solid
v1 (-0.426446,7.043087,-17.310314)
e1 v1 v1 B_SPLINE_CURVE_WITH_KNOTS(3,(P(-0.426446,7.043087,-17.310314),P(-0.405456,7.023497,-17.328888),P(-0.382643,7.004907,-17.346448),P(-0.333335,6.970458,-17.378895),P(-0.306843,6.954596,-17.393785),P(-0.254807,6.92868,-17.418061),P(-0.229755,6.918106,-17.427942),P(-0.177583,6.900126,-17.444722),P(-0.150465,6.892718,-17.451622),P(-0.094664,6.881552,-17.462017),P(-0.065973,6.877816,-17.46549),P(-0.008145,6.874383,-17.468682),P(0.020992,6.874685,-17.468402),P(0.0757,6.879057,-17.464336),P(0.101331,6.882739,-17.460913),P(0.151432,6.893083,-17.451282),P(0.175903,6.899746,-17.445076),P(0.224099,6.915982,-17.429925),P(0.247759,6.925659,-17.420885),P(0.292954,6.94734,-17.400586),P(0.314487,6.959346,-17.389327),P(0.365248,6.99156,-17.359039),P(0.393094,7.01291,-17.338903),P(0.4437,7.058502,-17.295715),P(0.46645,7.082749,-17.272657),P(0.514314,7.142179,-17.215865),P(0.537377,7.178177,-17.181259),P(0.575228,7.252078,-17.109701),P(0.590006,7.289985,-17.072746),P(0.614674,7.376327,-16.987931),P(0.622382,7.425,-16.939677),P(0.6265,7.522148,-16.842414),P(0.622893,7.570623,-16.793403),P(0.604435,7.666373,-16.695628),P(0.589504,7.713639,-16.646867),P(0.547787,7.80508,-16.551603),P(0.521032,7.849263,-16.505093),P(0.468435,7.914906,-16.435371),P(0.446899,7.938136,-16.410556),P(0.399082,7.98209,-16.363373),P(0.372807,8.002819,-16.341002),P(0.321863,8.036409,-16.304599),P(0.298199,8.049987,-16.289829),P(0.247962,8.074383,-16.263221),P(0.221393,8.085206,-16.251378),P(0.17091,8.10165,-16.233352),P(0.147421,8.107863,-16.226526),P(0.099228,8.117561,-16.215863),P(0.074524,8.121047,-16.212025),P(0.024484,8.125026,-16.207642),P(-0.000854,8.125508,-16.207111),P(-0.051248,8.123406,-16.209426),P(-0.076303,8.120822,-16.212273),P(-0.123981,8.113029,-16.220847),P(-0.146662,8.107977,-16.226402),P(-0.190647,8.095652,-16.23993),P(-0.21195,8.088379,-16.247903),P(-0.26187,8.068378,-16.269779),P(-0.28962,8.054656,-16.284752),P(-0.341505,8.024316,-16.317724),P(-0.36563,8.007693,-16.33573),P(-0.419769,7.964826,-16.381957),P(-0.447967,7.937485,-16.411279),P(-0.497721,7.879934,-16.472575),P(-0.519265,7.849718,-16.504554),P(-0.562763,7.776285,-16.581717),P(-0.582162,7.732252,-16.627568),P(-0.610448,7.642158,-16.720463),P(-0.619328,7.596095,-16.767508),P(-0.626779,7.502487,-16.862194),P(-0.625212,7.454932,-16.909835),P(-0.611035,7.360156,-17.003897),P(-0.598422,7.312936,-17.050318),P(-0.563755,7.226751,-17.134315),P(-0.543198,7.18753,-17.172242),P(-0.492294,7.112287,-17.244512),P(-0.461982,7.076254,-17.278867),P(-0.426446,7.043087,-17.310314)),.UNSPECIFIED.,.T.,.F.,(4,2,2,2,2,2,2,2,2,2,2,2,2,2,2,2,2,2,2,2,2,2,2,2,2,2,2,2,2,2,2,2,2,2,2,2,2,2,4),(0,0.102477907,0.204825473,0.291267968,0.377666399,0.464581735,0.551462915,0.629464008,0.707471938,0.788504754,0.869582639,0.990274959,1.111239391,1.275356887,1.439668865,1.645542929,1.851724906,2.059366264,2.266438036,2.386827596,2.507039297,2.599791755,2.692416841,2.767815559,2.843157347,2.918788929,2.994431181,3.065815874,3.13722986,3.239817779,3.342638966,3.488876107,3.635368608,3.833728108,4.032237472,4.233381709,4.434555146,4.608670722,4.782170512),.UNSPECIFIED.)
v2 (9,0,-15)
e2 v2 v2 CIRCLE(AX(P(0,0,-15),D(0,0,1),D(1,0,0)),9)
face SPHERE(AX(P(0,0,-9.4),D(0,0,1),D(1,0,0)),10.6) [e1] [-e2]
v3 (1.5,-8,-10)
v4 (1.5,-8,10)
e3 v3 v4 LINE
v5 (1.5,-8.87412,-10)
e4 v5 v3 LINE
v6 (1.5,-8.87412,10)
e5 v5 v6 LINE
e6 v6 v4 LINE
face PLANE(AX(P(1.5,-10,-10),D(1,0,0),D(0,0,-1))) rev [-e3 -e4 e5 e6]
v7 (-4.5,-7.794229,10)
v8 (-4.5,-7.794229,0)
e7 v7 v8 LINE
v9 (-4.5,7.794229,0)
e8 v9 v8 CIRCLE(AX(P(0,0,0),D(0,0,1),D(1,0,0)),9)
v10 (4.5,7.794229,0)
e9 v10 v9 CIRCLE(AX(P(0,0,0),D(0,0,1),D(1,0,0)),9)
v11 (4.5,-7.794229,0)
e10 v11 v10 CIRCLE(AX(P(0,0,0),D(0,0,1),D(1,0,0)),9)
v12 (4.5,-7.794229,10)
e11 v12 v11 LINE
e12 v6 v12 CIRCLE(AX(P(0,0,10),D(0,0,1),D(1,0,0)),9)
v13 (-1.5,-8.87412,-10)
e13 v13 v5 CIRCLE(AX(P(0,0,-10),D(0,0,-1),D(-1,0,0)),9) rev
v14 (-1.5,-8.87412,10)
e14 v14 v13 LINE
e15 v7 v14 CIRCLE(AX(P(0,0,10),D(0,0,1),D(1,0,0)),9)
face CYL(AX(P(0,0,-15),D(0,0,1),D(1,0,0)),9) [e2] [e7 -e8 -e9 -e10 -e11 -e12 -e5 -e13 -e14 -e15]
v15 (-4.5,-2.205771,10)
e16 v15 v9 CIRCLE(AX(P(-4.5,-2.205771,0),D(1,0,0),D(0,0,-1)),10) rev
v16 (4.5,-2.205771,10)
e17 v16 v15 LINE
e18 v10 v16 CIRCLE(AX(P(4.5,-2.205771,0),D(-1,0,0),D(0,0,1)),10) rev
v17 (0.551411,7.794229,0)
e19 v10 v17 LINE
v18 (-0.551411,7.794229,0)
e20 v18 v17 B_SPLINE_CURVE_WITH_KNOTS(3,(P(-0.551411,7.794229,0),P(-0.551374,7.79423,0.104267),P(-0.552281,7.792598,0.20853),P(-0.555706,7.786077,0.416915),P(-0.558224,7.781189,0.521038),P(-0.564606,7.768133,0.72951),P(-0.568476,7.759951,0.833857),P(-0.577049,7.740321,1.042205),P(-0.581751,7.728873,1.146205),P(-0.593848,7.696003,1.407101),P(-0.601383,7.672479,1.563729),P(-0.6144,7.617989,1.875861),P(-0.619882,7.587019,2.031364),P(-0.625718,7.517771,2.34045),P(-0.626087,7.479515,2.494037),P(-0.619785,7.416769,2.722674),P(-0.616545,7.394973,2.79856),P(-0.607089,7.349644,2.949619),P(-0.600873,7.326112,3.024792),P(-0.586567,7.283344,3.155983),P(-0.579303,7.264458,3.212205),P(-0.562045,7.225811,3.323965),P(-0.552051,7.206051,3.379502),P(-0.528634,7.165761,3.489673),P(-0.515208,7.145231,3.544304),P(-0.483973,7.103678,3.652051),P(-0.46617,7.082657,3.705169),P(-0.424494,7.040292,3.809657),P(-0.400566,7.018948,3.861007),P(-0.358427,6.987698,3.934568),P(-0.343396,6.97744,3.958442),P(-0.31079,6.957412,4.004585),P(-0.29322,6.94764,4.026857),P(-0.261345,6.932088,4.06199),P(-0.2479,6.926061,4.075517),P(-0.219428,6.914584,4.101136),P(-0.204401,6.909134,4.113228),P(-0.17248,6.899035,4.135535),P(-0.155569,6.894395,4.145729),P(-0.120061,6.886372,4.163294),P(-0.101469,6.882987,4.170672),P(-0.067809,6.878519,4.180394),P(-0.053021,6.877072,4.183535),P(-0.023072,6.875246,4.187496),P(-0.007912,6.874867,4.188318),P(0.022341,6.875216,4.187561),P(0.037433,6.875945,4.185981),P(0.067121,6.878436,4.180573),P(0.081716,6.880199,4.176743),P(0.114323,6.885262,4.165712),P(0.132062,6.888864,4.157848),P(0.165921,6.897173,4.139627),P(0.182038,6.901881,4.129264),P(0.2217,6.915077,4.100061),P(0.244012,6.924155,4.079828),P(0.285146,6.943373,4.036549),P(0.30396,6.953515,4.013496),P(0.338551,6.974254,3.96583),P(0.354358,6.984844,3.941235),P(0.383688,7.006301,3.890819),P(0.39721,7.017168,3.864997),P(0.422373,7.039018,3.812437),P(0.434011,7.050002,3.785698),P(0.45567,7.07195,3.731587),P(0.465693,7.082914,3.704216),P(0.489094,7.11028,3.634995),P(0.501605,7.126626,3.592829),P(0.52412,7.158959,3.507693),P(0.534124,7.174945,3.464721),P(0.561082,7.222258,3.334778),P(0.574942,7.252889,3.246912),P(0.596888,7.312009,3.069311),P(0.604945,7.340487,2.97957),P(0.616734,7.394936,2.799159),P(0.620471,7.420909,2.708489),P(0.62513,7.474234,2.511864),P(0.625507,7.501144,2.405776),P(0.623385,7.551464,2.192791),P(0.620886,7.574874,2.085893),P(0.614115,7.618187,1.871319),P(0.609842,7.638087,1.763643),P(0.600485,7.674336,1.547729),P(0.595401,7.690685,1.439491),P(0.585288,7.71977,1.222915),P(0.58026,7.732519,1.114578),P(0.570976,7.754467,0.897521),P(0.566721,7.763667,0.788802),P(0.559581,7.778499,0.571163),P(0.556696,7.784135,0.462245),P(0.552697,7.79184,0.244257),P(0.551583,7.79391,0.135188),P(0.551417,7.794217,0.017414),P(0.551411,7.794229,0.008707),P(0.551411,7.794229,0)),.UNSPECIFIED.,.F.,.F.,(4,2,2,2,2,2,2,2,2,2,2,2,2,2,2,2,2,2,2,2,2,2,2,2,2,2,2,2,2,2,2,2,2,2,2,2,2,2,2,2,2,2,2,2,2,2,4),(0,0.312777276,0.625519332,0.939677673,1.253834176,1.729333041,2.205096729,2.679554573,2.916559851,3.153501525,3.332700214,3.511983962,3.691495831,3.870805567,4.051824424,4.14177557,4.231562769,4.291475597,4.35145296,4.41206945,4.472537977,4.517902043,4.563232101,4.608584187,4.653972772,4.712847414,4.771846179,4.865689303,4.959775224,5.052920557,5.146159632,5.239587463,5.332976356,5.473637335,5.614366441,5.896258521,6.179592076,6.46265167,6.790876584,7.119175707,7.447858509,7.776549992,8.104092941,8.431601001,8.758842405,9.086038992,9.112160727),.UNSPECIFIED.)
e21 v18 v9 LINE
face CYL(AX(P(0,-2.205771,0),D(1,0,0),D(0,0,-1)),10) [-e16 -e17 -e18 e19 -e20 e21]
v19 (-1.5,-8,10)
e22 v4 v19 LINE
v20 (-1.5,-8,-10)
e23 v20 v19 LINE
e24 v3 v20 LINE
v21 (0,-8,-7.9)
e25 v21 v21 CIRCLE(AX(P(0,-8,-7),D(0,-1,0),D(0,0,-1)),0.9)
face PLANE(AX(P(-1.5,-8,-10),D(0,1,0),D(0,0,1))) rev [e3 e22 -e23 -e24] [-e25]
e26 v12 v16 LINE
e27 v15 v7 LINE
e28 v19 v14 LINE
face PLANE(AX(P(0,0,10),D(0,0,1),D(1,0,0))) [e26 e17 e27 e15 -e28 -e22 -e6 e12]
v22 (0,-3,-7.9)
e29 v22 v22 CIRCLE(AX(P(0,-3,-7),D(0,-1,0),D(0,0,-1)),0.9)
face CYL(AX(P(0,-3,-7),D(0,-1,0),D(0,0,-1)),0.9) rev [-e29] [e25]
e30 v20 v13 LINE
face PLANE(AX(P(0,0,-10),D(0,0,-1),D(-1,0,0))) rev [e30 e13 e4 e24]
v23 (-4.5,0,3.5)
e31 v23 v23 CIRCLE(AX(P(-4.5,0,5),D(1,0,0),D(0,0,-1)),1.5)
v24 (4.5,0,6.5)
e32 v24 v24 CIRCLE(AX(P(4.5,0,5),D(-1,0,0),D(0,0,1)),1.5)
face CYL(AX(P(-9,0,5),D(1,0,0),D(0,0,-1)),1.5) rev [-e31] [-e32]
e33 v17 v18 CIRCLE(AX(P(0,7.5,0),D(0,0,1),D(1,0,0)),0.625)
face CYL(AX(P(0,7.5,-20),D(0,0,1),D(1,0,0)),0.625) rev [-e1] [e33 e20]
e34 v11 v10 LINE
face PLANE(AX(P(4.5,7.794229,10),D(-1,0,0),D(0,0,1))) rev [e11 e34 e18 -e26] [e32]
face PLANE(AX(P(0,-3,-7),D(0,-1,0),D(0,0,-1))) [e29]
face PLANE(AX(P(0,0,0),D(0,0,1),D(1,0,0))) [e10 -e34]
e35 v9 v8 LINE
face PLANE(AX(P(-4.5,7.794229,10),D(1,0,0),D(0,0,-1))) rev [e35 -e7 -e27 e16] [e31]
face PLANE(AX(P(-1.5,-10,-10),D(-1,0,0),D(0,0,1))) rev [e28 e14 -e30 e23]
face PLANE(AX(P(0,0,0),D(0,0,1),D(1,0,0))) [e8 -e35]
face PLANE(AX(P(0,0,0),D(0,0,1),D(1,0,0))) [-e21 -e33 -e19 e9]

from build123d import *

# Parameters (mm, degrees)
SKETCH1_R               = 9
BOSS_EXTRUDE1_DEPTH     = 15
BOSS_EXTRUDE2_START     = 10
BOSS_EXTRUDE2_DEPTH     = 10
DOME2_FACE_RADIUS       = 9
DOME2_HEIGHT            = 5
CUT_EXTRUDE1_DEPTH      = 24.706539182
CUT_EXTRUDE1_DEPTH_BACK = 24.706539182
SKETCH3_R               = 1.5
FILLET4_R               = 10
CUT_EXTRUDE2_DEPTH      = 24.706539182
CUT_EXTRUDE2_DEPTH_BACK = 24.706539182
SKETCH4_R               = 0.625
SKETCH5_W               = 3
SKETCH5_H               = 2
CUT_EXTRUDE3_DEPTH      = 20
SKETCH6_R               = 0.9
CUT_EXTRUDE4_DEPTH      = 5


with BuildPart() as part:
    # Sketch1 → Boss-Extrude1 (new body)
    with BuildSketch(Plane.XY):
        Circle(SKETCH1_R)
    extrude(amount=-BOSS_EXTRUDE1_DEPTH)

    # Sketch2 → Boss-Extrude2 (add)
    with BuildSketch(Plane.XY.offset(BOSS_EXTRUDE2_START)):
        with BuildLine():
            Line((-4.5, 7.794228634), (-4.5, -7.794228634))
            ThreePointArc((-4.5, -7.794228634), (0, -9), (4.5, -7.794228634))
            Line((4.5, -7.794228634), (4.5, 7.794228634))
            Line((4.5, 7.794228634), (-4.5, 7.794228634))
        make_face()
    extrude(amount=-BOSS_EXTRUDE2_DEPTH)

    # Dome2: a dome of height H over a round flat face of radius A is a cap of a sphere of radius (A * A + H * H) / (2 * H)
    dome2_r = (DOME2_FACE_RADIUS * DOME2_FACE_RADIUS + DOME2_HEIGHT * DOME2_HEIGHT) / (2 * DOME2_HEIGHT)
    dome2_base = Plane((0, 0, -15), z_dir=(0, 0, -1))
    with Locations(dome2_base.offset(DOME2_HEIGHT - dome2_r)):
        dome2_ball = Sphere(dome2_r, mode=Mode.PRIVATE)
    add(split(dome2_ball, bisect_by=dome2_base, keep=Keep.TOP, mode=Mode.PRIVATE))

    # Sketch3 → Cut-Extrude1 (cut, two sides: drawn at the far end of the back side and taken through both)
    with BuildSketch(Plane(origin=(0, 0, 0), x_dir=(0, 0, -1), z_dir=(1, 0, 0)).offset(-CUT_EXTRUDE1_DEPTH_BACK)):
        with Locations((-5, 0)):
            Circle(SKETCH3_R)
    extrude(amount=CUT_EXTRUDE1_DEPTH + CUT_EXTRUDE1_DEPTH_BACK, mode=Mode.SUBTRACT)

    # Fillet4
    fillet4_edges = [part.edges().sort_by_distance(p)[0] for p in [
        (0, 7.794228634, 10),
    ]]
    fillet(fillet4_edges, radius=FILLET4_R - 0.0001)  # a hair under: the kernel refuses the full size

    # Sketch4 → Cut-Extrude2 (cut, two sides: drawn at the far end of the back side and taken through both)
    with BuildSketch(Plane.XY.offset(-CUT_EXTRUDE2_DEPTH_BACK)):
        with Locations(Location((0, 7.5, 0), (0, 0, 28.084018699))):
            Circle(SKETCH4_R)
    extrude(amount=CUT_EXTRUDE2_DEPTH + CUT_EXTRUDE2_DEPTH_BACK, mode=Mode.SUBTRACT)

    # Sketch5 → Cut-Extrude3 (cut)
    with BuildSketch(Plane.XY.offset(10)):
        with Locations((0, -9)):
            Rectangle(SKETCH5_W, SKETCH5_H)
    extrude(amount=-CUT_EXTRUDE3_DEPTH, mode=Mode.SUBTRACT)

    # Sketch6 → Cut-Extrude4 (cut)
    with BuildSketch(Plane(origin=(0, -8, 0), x_dir=(-1, 0, 0), z_dir=(0, -1, 0))):
        with Locations(Location((0, 7, 0), (0, 0, 90))):
            Circle(SKETCH6_R)
    extrude(amount=-CUT_EXTRUDE4_DEPTH, mode=Mode.SUBTRACT)


solid = part.part
